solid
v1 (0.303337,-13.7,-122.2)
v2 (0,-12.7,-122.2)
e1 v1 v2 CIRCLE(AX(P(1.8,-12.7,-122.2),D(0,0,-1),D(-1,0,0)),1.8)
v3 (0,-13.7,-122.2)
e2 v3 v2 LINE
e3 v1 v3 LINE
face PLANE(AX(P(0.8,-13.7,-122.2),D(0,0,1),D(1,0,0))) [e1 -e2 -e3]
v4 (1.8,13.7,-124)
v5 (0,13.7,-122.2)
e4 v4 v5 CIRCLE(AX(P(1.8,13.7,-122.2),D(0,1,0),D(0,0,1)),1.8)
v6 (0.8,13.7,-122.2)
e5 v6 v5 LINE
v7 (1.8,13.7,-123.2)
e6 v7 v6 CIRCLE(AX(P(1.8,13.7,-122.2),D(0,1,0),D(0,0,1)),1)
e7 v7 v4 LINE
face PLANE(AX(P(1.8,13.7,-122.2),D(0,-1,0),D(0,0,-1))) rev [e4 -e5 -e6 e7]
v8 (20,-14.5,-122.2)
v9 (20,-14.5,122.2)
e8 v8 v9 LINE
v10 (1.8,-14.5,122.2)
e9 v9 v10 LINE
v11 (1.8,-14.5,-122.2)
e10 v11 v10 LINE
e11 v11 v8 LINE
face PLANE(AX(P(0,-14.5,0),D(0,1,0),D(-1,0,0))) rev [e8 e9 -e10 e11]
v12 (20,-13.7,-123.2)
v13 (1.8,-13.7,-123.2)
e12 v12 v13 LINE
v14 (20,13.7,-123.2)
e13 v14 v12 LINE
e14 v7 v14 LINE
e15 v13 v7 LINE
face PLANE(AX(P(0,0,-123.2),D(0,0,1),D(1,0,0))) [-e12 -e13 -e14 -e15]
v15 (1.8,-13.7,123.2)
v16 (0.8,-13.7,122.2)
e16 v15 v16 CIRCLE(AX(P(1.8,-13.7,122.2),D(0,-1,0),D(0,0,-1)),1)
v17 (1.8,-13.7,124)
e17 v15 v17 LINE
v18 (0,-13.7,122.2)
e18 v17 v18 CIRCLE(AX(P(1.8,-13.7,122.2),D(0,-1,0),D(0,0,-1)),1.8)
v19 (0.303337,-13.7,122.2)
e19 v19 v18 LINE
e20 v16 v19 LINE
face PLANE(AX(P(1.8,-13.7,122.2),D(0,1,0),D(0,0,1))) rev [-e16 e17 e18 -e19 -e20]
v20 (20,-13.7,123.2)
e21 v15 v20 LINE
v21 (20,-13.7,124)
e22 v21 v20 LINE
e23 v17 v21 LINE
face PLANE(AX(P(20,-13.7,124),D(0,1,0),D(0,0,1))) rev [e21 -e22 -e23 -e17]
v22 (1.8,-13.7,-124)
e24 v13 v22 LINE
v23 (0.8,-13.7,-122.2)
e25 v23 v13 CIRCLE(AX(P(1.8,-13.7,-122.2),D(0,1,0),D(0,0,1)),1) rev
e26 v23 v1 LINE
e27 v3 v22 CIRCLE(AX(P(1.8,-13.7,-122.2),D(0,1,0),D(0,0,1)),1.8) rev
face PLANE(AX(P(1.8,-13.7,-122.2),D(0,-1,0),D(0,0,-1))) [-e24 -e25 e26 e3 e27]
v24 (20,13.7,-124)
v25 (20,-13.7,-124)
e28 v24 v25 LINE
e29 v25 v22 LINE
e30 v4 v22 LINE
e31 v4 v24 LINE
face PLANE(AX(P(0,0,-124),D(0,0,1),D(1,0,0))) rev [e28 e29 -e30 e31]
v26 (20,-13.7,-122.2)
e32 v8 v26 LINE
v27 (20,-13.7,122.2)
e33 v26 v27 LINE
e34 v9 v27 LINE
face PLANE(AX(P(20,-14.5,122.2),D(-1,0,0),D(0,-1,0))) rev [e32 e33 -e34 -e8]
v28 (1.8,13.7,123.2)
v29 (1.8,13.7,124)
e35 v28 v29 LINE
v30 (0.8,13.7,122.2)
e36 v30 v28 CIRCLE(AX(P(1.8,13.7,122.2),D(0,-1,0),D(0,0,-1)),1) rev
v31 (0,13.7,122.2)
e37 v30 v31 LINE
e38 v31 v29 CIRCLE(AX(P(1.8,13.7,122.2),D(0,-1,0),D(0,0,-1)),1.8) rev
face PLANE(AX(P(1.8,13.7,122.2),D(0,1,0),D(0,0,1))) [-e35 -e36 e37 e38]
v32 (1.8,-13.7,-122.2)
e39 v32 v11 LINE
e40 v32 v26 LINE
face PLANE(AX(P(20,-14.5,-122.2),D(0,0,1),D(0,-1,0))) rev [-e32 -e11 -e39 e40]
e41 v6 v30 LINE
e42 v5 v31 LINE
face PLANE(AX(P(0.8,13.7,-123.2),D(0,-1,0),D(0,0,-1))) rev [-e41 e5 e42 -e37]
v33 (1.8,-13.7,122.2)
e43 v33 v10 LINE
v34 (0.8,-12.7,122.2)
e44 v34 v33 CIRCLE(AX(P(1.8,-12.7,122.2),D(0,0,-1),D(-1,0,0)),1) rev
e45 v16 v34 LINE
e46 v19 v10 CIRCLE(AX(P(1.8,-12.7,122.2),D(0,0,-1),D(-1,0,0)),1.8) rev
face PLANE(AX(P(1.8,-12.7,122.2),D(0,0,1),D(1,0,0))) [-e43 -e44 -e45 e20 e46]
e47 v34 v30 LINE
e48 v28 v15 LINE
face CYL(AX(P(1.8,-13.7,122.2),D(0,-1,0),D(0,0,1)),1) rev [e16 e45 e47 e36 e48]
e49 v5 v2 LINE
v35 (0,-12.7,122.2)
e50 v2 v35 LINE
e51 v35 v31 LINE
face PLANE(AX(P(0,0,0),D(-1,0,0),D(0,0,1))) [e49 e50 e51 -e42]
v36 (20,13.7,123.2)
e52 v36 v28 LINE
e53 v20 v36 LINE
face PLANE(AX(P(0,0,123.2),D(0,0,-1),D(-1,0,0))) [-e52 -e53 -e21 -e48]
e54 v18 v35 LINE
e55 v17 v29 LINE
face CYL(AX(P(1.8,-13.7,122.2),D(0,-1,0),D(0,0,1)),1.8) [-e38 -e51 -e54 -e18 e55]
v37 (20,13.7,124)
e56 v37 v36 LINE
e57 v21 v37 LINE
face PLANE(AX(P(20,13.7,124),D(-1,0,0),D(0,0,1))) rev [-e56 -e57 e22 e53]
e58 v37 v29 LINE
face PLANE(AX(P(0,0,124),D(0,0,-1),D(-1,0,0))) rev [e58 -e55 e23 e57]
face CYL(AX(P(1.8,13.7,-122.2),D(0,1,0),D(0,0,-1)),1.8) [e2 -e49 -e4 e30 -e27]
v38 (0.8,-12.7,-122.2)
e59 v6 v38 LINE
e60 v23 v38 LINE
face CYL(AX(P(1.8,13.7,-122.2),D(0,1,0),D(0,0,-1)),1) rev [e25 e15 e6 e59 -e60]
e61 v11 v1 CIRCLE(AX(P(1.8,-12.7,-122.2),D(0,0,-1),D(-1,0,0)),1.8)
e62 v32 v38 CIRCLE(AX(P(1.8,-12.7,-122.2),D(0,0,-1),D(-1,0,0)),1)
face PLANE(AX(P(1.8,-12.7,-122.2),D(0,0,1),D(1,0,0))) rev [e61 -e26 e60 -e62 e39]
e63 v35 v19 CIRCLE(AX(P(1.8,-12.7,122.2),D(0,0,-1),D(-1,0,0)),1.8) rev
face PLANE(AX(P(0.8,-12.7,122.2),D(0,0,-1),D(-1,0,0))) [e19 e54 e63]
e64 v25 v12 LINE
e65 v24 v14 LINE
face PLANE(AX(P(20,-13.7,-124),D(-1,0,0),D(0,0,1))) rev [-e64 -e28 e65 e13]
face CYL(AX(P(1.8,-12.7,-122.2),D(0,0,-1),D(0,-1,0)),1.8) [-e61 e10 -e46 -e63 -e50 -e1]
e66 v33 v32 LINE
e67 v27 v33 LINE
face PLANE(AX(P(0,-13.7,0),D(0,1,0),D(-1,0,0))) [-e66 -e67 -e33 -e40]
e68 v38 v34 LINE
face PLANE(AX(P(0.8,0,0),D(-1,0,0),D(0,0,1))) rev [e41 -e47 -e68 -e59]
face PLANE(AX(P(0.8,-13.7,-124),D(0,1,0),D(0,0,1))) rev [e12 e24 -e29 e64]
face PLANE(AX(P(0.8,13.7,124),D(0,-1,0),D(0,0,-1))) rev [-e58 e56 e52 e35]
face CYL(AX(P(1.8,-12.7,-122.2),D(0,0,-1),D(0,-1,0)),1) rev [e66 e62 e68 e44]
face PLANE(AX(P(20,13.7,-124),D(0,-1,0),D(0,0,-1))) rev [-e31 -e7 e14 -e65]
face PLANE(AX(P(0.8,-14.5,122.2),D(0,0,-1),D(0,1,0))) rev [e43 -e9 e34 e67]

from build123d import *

# Parameters (mm, degrees)
SKETCH2_W                    = 246.4
SKETCH2_H                    = 27.4
BASE_FLANGE2_DEPTH           = 0.8
EDGE_FLANGE1_STRIP_W         = 5.2
EDGE_FLANGE1_STRIP_H         = 0.8
EDGE_FLANGE1_STRIP_CUT_DEPTH = 27.4
EDGE_FLANGE1_DEPTH           = 27.4
EDGE_FLANGE2_STRIP_W         = 5.2
EDGE_FLANGE2_STRIP_H         = 0.8
EDGE_FLANGE2_STRIP_CUT_DEPTH = 27.4
EDGE_FLANGE2_DEPTH           = 27.4
EDGE_FLANGE3_STRIP_W         = 5.2
EDGE_FLANGE3_STRIP_H         = 0.8
EDGE_FLANGE3_STRIP_CUT_DEPTH = 244.4
EDGE_FLANGE3_DEPTH           = 244.4


# Sheet-metal steps are written as plain solids
with BuildPart() as part:
    # Sketch2 → Base-Flange2 (new body)
    with BuildSketch(Plane(origin=(0, 0, 0), x_dir=(0, 0, -1), z_dir=(1, 0, 0))):
        Rectangle(SKETCH2_W, SKETCH2_H)
    extrude(amount=BASE_FLANGE2_DEPTH)

    # Edge-Flange1 strip (across the edge) → Edge-Flange1 strip cut (cut)
    with BuildSketch(Plane(origin=(0.8, 13.7, 123.2), x_dir=(0, 0, -1), z_dir=(0, -1, 0))):
        with Locations((-1.6, -0.4)):
            Rectangle(EDGE_FLANGE1_STRIP_W, EDGE_FLANGE1_STRIP_H)
    extrude(amount=EDGE_FLANGE1_STRIP_CUT_DEPTH, mode=Mode.SUBTRACT)

    # Edge-Flange1 section (across the edge) → Edge-Flange1 (add)
    with BuildSketch(Plane(origin=(0.8, 13.7, 123.2), x_dir=(0, 0, -1), z_dir=(0, -1, 0))):
        with BuildLine():
            Line((-0.8, 1), (-0.8, 19.2))
            Line((-0.8, 19.2), (0, 19.2))
            Line((0, 19.2), (0, 1))
            ThreePointArc((0, 1), (0.292893219, 0.292893219), (1, 0))
            Line((1, 0), (1, -0.8))
            ThreePointArc((1, -0.8), (-0.272792206, -0.272792206), (-0.8, 1))
        make_face()
    extrude(amount=EDGE_FLANGE1_DEPTH)

    # Edge-Flange2 strip (across the edge) → Edge-Flange2 strip cut (cut)
    with BuildSketch(Plane(origin=(0.8, -13.7, -123.2), x_dir=(0, 0, 1), z_dir=(0, 1, 0))):
        with Locations((-1.6, -0.4)):
            Rectangle(EDGE_FLANGE2_STRIP_W, EDGE_FLANGE2_STRIP_H)
    extrude(amount=EDGE_FLANGE2_STRIP_CUT_DEPTH, mode=Mode.SUBTRACT)

    # Edge-Flange2 section (across the edge) → Edge-Flange2 (add)
    with BuildSketch(Plane(origin=(0.8, -13.7, -123.2), x_dir=(0, 0, 1), z_dir=(0, 1, 0))):
        with BuildLine():
            Line((-0.8, 1), (-0.8, 19.2))
            Line((-0.8, 19.2), (0, 19.2))
            Line((0, 19.2), (0, 1))
            ThreePointArc((0, 1), (0.292893219, 0.292893219), (1, 0))
            Line((1, 0), (1, -0.8))
            ThreePointArc((1, -0.8), (-0.272792206, -0.272792206), (-0.8, 1))
        make_face()
    extrude(amount=EDGE_FLANGE2_DEPTH)

    # Edge-Flange3 strip (across the edge) → Edge-Flange3 strip cut (cut)
    with BuildSketch(Plane(origin=(0.8, -13.7, 122.2), x_dir=(0, 1, 0), z_dir=(0, 0, -1))):
        with Locations((-1.6, -0.4)):
            Rectangle(EDGE_FLANGE3_STRIP_W, EDGE_FLANGE3_STRIP_H)
    extrude(amount=EDGE_FLANGE3_STRIP_CUT_DEPTH, mode=Mode.SUBTRACT)

    # Edge-Flange3 section (across the edge) → Edge-Flange3 (add)
    with BuildSketch(Plane(origin=(0.8, -13.7, 122.2), x_dir=(0, 1, 0), z_dir=(0, 0, -1))):
        with BuildLine():
            Line((-0.8, 1), (-0.8, 19.2))
            Line((-0.8, 19.2), (0, 19.2))
            Line((0, 19.2), (0, 1))
            ThreePointArc((0, 1), (0.292893219, 0.292893219), (1, 0))
            Line((1, 0), (1, -0.8))
            ThreePointArc((1, -0.8), (-0.272792206, -0.272792206), (-0.8, 1))
        make_face()
    extrude(amount=EDGE_FLANGE3_DEPTH)


solid = part.part
